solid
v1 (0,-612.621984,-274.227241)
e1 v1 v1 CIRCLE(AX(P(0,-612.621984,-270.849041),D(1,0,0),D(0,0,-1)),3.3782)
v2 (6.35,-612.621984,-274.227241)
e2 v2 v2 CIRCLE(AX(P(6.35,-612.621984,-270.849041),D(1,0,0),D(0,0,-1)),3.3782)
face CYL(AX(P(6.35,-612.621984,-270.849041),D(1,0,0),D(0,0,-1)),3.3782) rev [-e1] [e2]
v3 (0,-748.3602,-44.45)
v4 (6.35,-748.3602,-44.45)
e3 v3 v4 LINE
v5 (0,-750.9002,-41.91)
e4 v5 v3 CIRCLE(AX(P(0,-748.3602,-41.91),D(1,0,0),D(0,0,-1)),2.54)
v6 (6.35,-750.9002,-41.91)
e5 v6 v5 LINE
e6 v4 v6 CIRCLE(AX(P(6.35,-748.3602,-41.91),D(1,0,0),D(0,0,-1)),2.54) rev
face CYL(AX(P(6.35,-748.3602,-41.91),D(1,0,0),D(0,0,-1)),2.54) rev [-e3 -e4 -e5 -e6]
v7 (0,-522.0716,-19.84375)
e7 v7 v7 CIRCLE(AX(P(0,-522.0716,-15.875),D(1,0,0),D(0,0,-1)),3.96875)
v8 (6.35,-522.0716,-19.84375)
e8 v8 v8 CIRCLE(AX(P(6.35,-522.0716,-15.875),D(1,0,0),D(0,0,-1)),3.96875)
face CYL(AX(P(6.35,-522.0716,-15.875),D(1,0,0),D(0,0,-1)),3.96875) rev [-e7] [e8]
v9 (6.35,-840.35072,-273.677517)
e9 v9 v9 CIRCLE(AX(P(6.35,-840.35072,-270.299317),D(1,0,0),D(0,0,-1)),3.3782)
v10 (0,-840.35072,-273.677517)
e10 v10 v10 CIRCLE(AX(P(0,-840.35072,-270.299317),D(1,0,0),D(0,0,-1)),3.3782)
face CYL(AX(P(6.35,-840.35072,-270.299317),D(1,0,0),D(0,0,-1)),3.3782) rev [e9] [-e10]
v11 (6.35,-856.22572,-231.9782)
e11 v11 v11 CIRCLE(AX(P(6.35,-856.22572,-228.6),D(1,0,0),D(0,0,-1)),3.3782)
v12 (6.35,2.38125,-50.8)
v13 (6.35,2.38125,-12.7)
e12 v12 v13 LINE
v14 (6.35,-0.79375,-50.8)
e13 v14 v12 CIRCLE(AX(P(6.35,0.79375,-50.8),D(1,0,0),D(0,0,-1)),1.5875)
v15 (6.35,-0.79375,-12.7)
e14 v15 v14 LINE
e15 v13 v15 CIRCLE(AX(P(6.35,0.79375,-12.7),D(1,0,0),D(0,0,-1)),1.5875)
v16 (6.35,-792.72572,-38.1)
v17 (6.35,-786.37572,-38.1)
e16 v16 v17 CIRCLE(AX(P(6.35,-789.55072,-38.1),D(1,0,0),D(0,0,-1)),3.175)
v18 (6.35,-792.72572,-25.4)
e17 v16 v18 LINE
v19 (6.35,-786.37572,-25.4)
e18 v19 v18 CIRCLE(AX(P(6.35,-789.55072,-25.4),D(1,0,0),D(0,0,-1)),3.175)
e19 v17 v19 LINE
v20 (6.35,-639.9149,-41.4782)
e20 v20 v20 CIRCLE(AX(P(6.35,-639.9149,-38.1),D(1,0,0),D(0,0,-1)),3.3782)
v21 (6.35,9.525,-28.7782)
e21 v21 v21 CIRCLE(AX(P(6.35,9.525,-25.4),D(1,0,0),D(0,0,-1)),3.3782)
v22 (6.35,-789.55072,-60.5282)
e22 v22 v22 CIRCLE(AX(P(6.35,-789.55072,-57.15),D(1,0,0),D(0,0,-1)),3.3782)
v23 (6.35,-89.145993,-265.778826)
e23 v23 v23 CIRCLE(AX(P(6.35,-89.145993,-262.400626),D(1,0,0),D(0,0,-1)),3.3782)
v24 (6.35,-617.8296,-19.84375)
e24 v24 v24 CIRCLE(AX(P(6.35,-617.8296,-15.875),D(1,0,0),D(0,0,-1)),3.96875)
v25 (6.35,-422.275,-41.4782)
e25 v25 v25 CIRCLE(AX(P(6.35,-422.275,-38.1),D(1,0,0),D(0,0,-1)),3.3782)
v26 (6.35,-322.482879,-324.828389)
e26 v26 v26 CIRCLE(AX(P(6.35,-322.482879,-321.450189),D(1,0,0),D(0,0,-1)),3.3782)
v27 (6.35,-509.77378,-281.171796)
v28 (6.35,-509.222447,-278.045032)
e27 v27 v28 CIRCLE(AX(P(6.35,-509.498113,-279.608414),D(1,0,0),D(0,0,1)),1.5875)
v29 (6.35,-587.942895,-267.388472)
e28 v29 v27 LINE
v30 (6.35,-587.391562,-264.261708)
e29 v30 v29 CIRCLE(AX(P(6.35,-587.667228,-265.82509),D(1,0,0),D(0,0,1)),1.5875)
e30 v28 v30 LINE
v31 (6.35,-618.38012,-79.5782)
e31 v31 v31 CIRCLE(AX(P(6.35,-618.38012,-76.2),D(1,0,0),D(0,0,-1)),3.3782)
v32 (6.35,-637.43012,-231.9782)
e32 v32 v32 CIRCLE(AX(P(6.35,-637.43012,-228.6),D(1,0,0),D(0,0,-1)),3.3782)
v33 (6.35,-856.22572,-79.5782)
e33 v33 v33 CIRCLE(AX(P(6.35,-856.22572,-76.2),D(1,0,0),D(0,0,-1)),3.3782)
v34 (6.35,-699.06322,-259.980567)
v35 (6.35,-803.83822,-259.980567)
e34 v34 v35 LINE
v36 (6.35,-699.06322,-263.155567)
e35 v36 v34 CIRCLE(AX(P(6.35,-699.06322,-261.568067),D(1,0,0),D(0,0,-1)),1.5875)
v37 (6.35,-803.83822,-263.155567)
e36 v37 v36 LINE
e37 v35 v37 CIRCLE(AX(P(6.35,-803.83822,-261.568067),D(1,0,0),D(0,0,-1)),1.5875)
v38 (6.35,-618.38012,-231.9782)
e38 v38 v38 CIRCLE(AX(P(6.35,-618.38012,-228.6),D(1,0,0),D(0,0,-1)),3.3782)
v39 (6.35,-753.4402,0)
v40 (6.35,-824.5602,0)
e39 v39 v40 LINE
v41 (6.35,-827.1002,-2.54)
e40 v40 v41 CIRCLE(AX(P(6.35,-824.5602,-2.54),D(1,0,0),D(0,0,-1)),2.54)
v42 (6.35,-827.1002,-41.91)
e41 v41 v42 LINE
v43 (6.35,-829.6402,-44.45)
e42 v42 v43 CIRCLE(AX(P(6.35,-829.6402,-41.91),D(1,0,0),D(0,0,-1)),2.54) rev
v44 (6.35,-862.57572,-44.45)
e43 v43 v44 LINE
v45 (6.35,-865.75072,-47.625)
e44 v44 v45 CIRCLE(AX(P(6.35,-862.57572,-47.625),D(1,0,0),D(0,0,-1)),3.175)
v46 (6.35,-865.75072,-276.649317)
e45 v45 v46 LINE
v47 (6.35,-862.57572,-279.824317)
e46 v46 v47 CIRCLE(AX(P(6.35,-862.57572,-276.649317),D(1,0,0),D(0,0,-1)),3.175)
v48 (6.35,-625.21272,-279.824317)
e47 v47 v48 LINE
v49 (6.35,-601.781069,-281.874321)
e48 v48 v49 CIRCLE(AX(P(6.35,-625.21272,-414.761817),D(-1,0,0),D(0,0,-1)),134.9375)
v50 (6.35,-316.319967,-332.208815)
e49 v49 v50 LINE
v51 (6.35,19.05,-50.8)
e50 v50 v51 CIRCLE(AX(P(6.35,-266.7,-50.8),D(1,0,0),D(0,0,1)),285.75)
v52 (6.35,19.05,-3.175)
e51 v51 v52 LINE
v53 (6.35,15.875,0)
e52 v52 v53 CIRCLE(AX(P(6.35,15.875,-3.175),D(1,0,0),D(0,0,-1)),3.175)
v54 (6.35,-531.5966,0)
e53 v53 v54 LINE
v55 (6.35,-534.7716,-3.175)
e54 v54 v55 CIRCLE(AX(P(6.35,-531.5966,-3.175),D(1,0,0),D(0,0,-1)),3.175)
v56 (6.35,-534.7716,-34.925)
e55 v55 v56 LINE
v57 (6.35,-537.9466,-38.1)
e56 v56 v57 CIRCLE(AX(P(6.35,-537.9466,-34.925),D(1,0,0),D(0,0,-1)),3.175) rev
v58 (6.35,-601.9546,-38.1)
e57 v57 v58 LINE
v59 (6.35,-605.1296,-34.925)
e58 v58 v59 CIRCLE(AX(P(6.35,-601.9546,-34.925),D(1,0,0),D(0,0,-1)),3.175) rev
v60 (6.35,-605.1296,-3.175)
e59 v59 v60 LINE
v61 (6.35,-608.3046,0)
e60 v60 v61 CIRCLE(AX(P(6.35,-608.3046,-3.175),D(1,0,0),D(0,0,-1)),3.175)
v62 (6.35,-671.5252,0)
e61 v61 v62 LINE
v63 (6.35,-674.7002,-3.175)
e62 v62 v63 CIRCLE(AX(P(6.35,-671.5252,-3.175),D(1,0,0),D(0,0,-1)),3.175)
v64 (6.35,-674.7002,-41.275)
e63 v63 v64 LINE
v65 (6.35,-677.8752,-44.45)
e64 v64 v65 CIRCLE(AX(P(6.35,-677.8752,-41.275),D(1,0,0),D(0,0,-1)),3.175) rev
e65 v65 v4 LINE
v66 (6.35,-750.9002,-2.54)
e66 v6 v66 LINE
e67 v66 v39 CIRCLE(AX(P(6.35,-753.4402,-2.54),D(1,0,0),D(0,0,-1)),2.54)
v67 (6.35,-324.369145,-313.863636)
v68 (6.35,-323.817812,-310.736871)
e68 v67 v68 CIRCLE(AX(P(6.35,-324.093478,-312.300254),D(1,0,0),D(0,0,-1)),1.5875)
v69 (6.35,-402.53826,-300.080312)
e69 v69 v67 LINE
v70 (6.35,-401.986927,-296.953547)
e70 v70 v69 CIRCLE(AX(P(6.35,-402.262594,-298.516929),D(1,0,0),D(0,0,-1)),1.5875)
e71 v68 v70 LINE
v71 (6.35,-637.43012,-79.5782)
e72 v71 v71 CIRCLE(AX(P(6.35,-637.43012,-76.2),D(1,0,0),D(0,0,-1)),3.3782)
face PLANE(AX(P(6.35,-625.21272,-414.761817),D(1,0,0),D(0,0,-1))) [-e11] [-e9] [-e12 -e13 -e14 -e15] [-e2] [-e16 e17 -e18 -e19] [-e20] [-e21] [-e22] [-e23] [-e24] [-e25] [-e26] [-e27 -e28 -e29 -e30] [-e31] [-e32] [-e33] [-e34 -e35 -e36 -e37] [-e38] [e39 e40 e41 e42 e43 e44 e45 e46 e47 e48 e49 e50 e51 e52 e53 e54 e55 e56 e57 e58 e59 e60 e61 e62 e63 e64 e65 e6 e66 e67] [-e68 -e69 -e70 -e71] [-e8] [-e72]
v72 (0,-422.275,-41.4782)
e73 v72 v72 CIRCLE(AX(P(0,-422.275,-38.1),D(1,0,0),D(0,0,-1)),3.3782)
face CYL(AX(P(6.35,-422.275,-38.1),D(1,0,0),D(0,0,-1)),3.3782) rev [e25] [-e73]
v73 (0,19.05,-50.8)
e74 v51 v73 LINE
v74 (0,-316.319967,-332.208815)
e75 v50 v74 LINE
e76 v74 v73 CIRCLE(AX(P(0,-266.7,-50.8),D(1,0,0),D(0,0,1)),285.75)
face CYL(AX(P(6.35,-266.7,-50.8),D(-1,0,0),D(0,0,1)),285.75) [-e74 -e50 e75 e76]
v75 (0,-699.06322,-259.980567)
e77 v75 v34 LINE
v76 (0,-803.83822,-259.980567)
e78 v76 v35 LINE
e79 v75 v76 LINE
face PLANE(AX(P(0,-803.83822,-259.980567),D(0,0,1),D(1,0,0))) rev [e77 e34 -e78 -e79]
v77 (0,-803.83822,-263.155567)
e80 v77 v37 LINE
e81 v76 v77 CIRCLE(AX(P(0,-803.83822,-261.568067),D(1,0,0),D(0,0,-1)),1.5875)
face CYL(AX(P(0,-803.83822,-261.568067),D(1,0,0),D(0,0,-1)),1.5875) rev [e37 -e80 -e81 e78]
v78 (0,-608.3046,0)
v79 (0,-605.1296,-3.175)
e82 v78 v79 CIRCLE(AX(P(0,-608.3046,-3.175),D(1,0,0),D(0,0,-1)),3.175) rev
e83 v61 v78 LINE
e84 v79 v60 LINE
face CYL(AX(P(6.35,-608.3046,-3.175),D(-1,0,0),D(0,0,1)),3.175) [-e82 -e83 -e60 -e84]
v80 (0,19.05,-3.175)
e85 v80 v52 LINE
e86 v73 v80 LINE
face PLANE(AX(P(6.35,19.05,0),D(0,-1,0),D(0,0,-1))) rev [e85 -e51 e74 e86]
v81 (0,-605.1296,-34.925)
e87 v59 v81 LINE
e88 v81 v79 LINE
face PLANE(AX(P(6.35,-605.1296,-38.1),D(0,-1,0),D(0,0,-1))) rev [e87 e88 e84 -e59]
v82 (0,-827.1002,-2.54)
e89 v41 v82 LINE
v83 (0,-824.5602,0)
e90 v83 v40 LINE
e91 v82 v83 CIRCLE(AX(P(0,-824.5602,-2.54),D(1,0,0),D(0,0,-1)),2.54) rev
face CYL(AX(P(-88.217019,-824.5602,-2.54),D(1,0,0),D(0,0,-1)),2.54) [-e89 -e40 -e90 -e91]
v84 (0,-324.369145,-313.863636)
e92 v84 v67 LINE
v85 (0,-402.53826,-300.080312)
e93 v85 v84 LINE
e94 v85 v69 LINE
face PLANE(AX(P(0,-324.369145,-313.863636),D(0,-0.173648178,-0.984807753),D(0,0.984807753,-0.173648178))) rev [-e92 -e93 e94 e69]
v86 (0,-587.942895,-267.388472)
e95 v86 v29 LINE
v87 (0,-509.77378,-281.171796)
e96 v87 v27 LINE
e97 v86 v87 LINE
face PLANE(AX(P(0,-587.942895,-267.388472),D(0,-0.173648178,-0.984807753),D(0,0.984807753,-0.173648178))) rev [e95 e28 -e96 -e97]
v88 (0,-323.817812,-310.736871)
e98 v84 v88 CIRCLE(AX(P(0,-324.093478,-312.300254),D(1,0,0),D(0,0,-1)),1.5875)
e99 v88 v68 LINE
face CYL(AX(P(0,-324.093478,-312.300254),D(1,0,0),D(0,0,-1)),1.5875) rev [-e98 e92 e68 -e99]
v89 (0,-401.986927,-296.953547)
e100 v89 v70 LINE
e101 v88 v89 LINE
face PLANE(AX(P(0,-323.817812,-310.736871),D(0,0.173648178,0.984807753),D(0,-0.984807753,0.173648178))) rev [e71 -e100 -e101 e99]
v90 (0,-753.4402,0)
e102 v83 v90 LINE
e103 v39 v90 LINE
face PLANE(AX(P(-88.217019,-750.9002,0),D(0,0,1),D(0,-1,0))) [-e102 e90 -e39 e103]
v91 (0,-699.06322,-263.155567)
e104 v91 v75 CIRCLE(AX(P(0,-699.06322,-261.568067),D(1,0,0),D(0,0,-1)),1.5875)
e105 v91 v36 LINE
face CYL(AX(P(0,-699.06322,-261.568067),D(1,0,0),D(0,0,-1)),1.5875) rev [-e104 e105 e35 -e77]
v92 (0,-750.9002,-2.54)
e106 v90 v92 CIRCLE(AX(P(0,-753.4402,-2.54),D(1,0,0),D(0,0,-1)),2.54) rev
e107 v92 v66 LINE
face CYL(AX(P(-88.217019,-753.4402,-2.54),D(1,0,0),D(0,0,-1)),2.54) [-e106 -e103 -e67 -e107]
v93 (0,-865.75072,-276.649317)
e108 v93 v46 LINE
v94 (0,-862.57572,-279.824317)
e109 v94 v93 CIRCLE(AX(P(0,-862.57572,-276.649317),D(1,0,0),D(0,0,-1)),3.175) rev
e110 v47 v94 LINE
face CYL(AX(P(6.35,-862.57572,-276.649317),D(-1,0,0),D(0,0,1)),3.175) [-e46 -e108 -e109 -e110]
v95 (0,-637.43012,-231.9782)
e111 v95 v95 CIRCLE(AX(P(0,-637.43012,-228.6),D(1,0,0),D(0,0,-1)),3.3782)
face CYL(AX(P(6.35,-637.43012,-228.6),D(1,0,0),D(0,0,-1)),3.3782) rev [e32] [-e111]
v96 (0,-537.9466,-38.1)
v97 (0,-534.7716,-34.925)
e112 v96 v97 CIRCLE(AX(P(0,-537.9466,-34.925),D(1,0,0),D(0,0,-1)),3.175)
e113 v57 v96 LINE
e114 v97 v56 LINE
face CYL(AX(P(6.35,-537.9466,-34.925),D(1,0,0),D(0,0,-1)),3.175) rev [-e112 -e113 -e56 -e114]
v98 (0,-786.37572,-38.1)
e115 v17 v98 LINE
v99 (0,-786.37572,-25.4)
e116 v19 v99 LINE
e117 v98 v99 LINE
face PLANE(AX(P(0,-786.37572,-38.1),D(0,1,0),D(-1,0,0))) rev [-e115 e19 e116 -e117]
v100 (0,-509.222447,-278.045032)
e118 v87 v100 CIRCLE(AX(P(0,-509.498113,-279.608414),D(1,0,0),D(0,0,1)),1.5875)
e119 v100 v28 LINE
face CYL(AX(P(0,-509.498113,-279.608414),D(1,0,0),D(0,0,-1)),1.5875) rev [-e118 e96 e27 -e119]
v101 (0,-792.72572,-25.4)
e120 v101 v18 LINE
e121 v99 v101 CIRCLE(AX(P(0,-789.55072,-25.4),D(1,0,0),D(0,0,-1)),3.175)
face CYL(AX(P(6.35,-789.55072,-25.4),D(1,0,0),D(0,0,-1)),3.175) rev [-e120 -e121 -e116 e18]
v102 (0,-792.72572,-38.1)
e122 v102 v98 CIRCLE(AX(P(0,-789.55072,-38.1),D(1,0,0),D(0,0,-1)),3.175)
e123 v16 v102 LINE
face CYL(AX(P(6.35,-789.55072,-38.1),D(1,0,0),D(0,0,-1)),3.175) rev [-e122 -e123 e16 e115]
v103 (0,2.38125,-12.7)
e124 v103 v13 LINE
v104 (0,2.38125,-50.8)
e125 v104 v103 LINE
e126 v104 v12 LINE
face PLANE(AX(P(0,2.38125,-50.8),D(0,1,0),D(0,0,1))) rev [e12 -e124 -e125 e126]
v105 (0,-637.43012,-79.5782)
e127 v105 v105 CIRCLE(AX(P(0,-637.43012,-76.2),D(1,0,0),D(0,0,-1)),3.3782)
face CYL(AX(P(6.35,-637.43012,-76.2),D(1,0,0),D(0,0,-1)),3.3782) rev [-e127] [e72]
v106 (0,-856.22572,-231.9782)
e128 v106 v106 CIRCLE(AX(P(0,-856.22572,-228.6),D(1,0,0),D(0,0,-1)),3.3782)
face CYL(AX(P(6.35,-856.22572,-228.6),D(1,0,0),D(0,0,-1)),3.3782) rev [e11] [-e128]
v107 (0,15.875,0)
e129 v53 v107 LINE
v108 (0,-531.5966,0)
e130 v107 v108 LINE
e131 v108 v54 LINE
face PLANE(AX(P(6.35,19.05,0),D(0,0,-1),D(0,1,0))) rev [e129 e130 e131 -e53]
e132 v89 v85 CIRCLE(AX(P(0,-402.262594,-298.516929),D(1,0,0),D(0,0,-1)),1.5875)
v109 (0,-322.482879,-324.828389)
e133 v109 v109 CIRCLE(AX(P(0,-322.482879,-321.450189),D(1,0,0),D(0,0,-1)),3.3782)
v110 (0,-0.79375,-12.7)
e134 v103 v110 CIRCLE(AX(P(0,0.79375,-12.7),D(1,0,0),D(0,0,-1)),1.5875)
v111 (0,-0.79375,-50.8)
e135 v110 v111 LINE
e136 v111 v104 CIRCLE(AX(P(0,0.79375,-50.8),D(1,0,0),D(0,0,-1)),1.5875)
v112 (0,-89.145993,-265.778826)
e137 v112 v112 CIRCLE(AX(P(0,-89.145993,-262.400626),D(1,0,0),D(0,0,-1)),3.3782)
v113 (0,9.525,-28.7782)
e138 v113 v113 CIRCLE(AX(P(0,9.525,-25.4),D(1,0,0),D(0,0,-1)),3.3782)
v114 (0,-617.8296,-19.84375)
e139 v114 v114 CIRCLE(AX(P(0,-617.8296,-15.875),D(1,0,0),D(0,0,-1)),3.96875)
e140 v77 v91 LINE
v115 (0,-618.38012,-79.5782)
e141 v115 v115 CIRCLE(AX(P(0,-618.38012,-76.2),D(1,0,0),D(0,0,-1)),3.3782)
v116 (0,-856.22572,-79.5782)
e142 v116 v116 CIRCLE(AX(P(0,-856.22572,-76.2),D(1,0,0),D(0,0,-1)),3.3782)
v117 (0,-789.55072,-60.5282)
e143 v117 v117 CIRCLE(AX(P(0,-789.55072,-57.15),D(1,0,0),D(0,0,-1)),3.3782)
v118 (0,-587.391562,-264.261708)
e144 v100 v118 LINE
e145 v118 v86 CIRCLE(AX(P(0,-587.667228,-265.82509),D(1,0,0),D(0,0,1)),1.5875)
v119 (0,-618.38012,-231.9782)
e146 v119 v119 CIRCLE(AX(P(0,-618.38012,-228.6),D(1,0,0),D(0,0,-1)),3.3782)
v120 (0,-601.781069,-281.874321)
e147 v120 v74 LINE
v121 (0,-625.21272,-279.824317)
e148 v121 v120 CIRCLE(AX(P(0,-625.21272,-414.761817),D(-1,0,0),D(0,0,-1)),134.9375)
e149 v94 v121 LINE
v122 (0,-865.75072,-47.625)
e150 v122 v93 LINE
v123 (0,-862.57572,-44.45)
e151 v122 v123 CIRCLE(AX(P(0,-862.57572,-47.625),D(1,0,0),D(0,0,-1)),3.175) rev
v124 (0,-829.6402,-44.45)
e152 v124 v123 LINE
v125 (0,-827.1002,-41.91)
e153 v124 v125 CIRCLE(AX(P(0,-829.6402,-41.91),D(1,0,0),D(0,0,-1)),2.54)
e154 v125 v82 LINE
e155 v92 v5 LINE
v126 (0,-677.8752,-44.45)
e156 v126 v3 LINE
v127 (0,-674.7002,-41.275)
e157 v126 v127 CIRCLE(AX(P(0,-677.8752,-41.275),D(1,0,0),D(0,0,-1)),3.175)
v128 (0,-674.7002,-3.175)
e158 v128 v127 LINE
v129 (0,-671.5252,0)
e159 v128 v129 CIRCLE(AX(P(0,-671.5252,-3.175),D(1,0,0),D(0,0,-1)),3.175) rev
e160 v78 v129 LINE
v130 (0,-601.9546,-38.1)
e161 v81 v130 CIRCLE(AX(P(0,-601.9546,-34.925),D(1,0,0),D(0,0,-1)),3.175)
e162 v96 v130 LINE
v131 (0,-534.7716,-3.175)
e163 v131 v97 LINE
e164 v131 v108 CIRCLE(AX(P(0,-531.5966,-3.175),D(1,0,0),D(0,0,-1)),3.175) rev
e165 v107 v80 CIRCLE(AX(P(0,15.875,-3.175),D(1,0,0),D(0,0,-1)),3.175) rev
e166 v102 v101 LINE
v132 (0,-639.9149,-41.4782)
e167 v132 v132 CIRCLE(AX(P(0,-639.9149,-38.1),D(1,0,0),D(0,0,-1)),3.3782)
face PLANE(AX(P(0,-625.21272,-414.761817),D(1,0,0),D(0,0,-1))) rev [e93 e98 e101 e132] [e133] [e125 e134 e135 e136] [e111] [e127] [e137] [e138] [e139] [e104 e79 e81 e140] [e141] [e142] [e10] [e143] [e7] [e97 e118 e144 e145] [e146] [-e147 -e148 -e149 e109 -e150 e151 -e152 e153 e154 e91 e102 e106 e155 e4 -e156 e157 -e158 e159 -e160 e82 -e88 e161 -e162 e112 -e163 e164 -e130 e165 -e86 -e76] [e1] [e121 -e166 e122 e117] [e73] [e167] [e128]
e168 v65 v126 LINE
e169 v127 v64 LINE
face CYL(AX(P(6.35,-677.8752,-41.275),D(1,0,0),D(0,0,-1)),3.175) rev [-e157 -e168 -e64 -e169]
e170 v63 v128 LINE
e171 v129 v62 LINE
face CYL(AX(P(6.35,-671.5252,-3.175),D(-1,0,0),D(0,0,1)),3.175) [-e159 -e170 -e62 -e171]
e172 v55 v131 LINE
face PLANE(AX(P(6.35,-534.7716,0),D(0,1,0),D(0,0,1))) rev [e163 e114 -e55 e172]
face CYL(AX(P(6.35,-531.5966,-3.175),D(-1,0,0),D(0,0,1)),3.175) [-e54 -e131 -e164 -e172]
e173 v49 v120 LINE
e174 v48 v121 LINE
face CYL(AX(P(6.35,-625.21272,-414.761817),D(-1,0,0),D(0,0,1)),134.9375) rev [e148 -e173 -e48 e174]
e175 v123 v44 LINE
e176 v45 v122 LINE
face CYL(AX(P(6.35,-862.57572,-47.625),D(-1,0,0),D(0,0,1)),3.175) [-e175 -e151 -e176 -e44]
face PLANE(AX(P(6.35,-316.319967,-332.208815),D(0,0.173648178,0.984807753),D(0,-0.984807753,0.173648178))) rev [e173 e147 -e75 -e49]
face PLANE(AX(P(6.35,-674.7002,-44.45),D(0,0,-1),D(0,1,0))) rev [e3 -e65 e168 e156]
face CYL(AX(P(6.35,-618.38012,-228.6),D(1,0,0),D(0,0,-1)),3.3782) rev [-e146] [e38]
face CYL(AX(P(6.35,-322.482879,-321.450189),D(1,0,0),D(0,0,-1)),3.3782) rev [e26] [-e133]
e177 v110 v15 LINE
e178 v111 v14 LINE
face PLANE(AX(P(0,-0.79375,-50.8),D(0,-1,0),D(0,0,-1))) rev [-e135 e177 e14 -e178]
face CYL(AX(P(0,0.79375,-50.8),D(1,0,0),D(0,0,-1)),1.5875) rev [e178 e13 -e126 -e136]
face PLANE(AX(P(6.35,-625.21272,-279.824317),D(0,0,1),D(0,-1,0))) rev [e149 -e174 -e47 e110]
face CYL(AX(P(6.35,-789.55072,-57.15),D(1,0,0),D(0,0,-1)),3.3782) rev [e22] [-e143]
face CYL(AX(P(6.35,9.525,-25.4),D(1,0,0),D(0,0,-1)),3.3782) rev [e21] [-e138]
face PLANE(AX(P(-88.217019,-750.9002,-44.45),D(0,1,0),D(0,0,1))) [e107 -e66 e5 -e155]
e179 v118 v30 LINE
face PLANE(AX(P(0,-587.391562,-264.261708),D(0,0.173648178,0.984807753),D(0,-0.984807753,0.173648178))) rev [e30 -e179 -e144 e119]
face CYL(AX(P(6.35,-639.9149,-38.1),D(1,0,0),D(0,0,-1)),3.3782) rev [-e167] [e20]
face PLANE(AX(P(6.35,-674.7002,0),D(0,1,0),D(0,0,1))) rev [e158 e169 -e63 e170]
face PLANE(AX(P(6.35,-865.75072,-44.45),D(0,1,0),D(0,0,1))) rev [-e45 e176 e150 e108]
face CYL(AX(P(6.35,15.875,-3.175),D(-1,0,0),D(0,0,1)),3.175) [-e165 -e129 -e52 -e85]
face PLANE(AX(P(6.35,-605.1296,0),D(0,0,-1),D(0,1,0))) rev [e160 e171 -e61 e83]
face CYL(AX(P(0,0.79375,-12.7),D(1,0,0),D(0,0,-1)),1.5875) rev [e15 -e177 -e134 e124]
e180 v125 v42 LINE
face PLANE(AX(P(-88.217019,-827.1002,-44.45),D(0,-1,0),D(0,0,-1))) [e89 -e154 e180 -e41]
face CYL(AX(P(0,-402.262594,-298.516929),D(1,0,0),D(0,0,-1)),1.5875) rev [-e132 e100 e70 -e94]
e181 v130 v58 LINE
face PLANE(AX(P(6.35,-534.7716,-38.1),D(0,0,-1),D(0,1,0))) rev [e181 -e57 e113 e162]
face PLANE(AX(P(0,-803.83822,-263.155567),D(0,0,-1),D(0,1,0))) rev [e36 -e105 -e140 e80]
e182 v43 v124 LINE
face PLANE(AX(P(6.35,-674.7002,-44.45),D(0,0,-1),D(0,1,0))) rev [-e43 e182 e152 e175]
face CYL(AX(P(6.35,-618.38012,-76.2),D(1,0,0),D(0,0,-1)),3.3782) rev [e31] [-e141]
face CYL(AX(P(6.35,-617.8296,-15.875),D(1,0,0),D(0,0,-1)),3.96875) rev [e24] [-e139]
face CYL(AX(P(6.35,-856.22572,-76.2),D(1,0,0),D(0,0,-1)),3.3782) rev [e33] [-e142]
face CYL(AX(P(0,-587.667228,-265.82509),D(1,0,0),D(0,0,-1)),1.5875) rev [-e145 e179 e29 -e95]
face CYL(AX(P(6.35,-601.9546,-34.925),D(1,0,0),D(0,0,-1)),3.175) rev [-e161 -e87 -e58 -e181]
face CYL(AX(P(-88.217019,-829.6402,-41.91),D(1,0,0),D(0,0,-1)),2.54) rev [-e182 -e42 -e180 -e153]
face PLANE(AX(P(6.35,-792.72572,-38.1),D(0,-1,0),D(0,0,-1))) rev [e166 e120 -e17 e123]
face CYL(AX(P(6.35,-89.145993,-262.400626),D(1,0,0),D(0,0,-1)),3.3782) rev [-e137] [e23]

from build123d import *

# Parameters (mm, degrees)
BOSS_EXTRUDE1_DEPTH             = 6.35
F_1_4_CLEARANCE_HOLE1_D         = 6.7564
CUT_EXTRUDE1_DEPTH              = 929.886717725
FILLET1_R                       = 3.175
SKETCH5_W                       = 44.45
SKETCH5_H                       = 76.2
BOSS_EXTRUDE2_DEPTH             = 6.35
FILLET2_R                       = 2.54
F_1_4_0_25_DIAMETER_SLOT1_DEPTH = 6.35
F_5_16_0_3125_DIAMETER_HOLE1_D  = 7.9375


# Read off the part's stored shape, not the designer's step: 1/4 (0.25) Diameter Slot1
with BuildPart() as part:
    # Sketch1 → Boss-Extrude1 (new body)
    with BuildSketch(Plane(origin=(0, 0, 0), x_dir=(0, 0, -1), z_dir=(1, 0, 0))):
        with BuildLine():
            Line((0, 19.05), (50.8, 19.05))
            ThreePointArc((50.8, 19.05), (269.697199621, -83.023440532), (332.208815423, -316.319966768))
            Line((332.208815423, -316.319966768), (281.874321133, -601.781069134))
            ThreePointArc((281.874321133, -601.781069134), (280.337795232, -613.452142071), (279.824317306, -625.212720108))
            Line((279.824317306, -625.212720108), (279.824317306, -865.750720108))
            Line((279.824317306, -865.750720108), (44.45, -865.750720108))
            Line((44.45, -865.750720108), (44.45, -674.7002))
            Line((44.45, -674.7002), (0, -674.7002))
            Line((0, -674.7002), (0, -605.1296))
            Line((0, -605.1296), (38.1, -605.1296))
            Line((38.1, -605.1296), (38.1, -534.7716))
            Line((38.1, -534.7716), (0, -534.7716))
            Line((0, -534.7716), (0, 19.05))
        make_face()
    extrude(amount=BOSS_EXTRUDE1_DEPTH)

    # 1/4 Clearance Hole1 (through all)
    with Locations(Plane(origin=(6.35, 0, 0), x_dir=(0, 0, -1), z_dir=(1, 0, 0))):
        with Locations((25.4, 9.525), (262.400626301, -89.145992514), (321.450189166, -322.482879416), (270.849040732, -612.621983621), (270.299317306, -840.350720108), (38.1, -639.9149), (38.1, -422.275), (76.2, -637.430120108), (228.6, -637.430120108), (76.2, -856.225720108), (228.6, -856.225720108), (228.6, -618.380120108), (76.2, -618.380120108), (57.15, -789.550720108)):
            Hole(F_1_4_CLEARANCE_HOLE1_D / 2)

    # Sketch4 → Cut-Extrude1 (cut, through all)
    with BuildSketch(Plane(origin=(6.35, 0, 0), x_dir=(0, 0, -1), z_dir=(1, 0, 0))):
        with BuildLine():
            Line((50.8, -0.79375), (12.7, -0.79375))
            ThreePointArc((12.7, -0.79375), (11.1125, 0.79375), (12.7, 2.38125))
            Line((12.7, 2.38125), (50.8, 2.38125))
            ThreePointArc((50.8, 2.38125), (52.3875, 0.79375), (50.8, -0.79375))
        make_face()
        with BuildLine():
            Line((313.863635816, -324.369144862), (300.080311714, -402.538260258))
            ThreePointArc((300.080311714, -402.538260258), (298.241262924, -403.825976083), (296.953547098, -401.986927293))
            Line((296.953547098, -401.986927293), (310.7368712, -323.817811898))
            ThreePointArc((310.7368712, -323.817811898), (312.57591999, -322.530096072), (313.863635816, -324.369144862))
        make_face()
        with BuildLine():
            Line((267.388472275, -587.942894917), (281.171796377, -509.773779521))
            ThreePointArc((281.171796377, -509.773779521), (279.884080551, -507.934730732), (278.045031761, -509.222446557))
            Line((278.045031761, -509.222446557), (264.261707659, -587.391561953))
            ThreePointArc((264.261707659, -587.391561953), (265.549423485, -589.230610743), (267.388472275, -587.942894917))
        make_face()
        with BuildLine():
            Line((259.980567306, -803.838220108), (259.980567306, -699.063220108))
            ThreePointArc((259.980567306, -699.063220108), (261.568067306, -697.475720108), (263.155567306, -699.063220108))
            Line((263.155567306, -699.063220108), (263.155567306, -803.838220108))
            ThreePointArc((263.155567306, -803.838220108), (261.568067306, -805.425720108), (259.980567306, -803.838220108))
        make_face()
    extrude(amount=-CUT_EXTRUDE1_DEPTH, mode=Mode.SUBTRACT)

    # Fillet1
    fillet1_edges = [part.edges().sort_by_distance(p)[0] for p in [
        (3.175, -605.1296, -38.1),
        (3.175, -534.7716, -38.1),
        (3.175, -534.7716, 0),
        (3.175, 19.05, 0),
        (3.175, -865.750720108, -279.824317306),
        (3.175, -865.750720108, -44.45),
        (3.175, -674.7002, -44.45),
        (3.175, -674.7002, 0),
        (3.175, -605.1296, 0),
    ]]
    fillet(fillet1_edges, radius=FILLET1_R)

    # Sketch5 → Boss-Extrude2 (add)
    with BuildSketch(Plane(origin=(6.35, 0, 0), x_dir=(0, 0, -1), z_dir=(1, 0, 0))):
        with Locations((22.225, -789.0002)):
            Rectangle(SKETCH5_W, SKETCH5_H)
    extrude(amount=-BOSS_EXTRUDE2_DEPTH)

    # Fillet2
    fillet2_edges = [part.edges().sort_by_distance(p)[0] for p in [
        (3.175, -750.9002, -44.45),
        (3.175, -827.1002, -44.45),
        (3.175, -827.1002, 0),
        (3.175, -750.9002, 0),
    ]]
    fillet(fillet2_edges, radius=FILLET2_R)

    # 1/4 (0.25) Diameter Slot1 outline → 1/4 (0.25) Diameter Slot1 (cut)
    with BuildSketch(Plane.YZ):
        with BuildLine():
            Line((-786.375720108, -38.1), (-786.375720108, -25.4))
            ThreePointArc((-786.375720108, -25.4), (-789.550720108, -22.225), (-792.725720108, -25.4))
            Line((-792.725720108, -25.4), (-792.725720108, -38.1))
            ThreePointArc((-792.725720108, -38.1), (-789.550720108, -41.275), (-786.375720108, -38.1))
        make_face()
    extrude(amount=F_1_4_0_25_DIAMETER_SLOT1_DEPTH, mode=Mode.SUBTRACT)

    # 5/16 (0.3125) Diameter Hole1 (through all)
    with Locations(Plane(origin=(6.35, 0, 0), x_dir=(0, 0, -1), z_dir=(1, 0, 0))):
        with Locations((15.875, -522.0716), (15.875, -617.8296)):
            Hole(F_5_16_0_3125_DIAMETER_HOLE1_D / 2)


solid = part.part
